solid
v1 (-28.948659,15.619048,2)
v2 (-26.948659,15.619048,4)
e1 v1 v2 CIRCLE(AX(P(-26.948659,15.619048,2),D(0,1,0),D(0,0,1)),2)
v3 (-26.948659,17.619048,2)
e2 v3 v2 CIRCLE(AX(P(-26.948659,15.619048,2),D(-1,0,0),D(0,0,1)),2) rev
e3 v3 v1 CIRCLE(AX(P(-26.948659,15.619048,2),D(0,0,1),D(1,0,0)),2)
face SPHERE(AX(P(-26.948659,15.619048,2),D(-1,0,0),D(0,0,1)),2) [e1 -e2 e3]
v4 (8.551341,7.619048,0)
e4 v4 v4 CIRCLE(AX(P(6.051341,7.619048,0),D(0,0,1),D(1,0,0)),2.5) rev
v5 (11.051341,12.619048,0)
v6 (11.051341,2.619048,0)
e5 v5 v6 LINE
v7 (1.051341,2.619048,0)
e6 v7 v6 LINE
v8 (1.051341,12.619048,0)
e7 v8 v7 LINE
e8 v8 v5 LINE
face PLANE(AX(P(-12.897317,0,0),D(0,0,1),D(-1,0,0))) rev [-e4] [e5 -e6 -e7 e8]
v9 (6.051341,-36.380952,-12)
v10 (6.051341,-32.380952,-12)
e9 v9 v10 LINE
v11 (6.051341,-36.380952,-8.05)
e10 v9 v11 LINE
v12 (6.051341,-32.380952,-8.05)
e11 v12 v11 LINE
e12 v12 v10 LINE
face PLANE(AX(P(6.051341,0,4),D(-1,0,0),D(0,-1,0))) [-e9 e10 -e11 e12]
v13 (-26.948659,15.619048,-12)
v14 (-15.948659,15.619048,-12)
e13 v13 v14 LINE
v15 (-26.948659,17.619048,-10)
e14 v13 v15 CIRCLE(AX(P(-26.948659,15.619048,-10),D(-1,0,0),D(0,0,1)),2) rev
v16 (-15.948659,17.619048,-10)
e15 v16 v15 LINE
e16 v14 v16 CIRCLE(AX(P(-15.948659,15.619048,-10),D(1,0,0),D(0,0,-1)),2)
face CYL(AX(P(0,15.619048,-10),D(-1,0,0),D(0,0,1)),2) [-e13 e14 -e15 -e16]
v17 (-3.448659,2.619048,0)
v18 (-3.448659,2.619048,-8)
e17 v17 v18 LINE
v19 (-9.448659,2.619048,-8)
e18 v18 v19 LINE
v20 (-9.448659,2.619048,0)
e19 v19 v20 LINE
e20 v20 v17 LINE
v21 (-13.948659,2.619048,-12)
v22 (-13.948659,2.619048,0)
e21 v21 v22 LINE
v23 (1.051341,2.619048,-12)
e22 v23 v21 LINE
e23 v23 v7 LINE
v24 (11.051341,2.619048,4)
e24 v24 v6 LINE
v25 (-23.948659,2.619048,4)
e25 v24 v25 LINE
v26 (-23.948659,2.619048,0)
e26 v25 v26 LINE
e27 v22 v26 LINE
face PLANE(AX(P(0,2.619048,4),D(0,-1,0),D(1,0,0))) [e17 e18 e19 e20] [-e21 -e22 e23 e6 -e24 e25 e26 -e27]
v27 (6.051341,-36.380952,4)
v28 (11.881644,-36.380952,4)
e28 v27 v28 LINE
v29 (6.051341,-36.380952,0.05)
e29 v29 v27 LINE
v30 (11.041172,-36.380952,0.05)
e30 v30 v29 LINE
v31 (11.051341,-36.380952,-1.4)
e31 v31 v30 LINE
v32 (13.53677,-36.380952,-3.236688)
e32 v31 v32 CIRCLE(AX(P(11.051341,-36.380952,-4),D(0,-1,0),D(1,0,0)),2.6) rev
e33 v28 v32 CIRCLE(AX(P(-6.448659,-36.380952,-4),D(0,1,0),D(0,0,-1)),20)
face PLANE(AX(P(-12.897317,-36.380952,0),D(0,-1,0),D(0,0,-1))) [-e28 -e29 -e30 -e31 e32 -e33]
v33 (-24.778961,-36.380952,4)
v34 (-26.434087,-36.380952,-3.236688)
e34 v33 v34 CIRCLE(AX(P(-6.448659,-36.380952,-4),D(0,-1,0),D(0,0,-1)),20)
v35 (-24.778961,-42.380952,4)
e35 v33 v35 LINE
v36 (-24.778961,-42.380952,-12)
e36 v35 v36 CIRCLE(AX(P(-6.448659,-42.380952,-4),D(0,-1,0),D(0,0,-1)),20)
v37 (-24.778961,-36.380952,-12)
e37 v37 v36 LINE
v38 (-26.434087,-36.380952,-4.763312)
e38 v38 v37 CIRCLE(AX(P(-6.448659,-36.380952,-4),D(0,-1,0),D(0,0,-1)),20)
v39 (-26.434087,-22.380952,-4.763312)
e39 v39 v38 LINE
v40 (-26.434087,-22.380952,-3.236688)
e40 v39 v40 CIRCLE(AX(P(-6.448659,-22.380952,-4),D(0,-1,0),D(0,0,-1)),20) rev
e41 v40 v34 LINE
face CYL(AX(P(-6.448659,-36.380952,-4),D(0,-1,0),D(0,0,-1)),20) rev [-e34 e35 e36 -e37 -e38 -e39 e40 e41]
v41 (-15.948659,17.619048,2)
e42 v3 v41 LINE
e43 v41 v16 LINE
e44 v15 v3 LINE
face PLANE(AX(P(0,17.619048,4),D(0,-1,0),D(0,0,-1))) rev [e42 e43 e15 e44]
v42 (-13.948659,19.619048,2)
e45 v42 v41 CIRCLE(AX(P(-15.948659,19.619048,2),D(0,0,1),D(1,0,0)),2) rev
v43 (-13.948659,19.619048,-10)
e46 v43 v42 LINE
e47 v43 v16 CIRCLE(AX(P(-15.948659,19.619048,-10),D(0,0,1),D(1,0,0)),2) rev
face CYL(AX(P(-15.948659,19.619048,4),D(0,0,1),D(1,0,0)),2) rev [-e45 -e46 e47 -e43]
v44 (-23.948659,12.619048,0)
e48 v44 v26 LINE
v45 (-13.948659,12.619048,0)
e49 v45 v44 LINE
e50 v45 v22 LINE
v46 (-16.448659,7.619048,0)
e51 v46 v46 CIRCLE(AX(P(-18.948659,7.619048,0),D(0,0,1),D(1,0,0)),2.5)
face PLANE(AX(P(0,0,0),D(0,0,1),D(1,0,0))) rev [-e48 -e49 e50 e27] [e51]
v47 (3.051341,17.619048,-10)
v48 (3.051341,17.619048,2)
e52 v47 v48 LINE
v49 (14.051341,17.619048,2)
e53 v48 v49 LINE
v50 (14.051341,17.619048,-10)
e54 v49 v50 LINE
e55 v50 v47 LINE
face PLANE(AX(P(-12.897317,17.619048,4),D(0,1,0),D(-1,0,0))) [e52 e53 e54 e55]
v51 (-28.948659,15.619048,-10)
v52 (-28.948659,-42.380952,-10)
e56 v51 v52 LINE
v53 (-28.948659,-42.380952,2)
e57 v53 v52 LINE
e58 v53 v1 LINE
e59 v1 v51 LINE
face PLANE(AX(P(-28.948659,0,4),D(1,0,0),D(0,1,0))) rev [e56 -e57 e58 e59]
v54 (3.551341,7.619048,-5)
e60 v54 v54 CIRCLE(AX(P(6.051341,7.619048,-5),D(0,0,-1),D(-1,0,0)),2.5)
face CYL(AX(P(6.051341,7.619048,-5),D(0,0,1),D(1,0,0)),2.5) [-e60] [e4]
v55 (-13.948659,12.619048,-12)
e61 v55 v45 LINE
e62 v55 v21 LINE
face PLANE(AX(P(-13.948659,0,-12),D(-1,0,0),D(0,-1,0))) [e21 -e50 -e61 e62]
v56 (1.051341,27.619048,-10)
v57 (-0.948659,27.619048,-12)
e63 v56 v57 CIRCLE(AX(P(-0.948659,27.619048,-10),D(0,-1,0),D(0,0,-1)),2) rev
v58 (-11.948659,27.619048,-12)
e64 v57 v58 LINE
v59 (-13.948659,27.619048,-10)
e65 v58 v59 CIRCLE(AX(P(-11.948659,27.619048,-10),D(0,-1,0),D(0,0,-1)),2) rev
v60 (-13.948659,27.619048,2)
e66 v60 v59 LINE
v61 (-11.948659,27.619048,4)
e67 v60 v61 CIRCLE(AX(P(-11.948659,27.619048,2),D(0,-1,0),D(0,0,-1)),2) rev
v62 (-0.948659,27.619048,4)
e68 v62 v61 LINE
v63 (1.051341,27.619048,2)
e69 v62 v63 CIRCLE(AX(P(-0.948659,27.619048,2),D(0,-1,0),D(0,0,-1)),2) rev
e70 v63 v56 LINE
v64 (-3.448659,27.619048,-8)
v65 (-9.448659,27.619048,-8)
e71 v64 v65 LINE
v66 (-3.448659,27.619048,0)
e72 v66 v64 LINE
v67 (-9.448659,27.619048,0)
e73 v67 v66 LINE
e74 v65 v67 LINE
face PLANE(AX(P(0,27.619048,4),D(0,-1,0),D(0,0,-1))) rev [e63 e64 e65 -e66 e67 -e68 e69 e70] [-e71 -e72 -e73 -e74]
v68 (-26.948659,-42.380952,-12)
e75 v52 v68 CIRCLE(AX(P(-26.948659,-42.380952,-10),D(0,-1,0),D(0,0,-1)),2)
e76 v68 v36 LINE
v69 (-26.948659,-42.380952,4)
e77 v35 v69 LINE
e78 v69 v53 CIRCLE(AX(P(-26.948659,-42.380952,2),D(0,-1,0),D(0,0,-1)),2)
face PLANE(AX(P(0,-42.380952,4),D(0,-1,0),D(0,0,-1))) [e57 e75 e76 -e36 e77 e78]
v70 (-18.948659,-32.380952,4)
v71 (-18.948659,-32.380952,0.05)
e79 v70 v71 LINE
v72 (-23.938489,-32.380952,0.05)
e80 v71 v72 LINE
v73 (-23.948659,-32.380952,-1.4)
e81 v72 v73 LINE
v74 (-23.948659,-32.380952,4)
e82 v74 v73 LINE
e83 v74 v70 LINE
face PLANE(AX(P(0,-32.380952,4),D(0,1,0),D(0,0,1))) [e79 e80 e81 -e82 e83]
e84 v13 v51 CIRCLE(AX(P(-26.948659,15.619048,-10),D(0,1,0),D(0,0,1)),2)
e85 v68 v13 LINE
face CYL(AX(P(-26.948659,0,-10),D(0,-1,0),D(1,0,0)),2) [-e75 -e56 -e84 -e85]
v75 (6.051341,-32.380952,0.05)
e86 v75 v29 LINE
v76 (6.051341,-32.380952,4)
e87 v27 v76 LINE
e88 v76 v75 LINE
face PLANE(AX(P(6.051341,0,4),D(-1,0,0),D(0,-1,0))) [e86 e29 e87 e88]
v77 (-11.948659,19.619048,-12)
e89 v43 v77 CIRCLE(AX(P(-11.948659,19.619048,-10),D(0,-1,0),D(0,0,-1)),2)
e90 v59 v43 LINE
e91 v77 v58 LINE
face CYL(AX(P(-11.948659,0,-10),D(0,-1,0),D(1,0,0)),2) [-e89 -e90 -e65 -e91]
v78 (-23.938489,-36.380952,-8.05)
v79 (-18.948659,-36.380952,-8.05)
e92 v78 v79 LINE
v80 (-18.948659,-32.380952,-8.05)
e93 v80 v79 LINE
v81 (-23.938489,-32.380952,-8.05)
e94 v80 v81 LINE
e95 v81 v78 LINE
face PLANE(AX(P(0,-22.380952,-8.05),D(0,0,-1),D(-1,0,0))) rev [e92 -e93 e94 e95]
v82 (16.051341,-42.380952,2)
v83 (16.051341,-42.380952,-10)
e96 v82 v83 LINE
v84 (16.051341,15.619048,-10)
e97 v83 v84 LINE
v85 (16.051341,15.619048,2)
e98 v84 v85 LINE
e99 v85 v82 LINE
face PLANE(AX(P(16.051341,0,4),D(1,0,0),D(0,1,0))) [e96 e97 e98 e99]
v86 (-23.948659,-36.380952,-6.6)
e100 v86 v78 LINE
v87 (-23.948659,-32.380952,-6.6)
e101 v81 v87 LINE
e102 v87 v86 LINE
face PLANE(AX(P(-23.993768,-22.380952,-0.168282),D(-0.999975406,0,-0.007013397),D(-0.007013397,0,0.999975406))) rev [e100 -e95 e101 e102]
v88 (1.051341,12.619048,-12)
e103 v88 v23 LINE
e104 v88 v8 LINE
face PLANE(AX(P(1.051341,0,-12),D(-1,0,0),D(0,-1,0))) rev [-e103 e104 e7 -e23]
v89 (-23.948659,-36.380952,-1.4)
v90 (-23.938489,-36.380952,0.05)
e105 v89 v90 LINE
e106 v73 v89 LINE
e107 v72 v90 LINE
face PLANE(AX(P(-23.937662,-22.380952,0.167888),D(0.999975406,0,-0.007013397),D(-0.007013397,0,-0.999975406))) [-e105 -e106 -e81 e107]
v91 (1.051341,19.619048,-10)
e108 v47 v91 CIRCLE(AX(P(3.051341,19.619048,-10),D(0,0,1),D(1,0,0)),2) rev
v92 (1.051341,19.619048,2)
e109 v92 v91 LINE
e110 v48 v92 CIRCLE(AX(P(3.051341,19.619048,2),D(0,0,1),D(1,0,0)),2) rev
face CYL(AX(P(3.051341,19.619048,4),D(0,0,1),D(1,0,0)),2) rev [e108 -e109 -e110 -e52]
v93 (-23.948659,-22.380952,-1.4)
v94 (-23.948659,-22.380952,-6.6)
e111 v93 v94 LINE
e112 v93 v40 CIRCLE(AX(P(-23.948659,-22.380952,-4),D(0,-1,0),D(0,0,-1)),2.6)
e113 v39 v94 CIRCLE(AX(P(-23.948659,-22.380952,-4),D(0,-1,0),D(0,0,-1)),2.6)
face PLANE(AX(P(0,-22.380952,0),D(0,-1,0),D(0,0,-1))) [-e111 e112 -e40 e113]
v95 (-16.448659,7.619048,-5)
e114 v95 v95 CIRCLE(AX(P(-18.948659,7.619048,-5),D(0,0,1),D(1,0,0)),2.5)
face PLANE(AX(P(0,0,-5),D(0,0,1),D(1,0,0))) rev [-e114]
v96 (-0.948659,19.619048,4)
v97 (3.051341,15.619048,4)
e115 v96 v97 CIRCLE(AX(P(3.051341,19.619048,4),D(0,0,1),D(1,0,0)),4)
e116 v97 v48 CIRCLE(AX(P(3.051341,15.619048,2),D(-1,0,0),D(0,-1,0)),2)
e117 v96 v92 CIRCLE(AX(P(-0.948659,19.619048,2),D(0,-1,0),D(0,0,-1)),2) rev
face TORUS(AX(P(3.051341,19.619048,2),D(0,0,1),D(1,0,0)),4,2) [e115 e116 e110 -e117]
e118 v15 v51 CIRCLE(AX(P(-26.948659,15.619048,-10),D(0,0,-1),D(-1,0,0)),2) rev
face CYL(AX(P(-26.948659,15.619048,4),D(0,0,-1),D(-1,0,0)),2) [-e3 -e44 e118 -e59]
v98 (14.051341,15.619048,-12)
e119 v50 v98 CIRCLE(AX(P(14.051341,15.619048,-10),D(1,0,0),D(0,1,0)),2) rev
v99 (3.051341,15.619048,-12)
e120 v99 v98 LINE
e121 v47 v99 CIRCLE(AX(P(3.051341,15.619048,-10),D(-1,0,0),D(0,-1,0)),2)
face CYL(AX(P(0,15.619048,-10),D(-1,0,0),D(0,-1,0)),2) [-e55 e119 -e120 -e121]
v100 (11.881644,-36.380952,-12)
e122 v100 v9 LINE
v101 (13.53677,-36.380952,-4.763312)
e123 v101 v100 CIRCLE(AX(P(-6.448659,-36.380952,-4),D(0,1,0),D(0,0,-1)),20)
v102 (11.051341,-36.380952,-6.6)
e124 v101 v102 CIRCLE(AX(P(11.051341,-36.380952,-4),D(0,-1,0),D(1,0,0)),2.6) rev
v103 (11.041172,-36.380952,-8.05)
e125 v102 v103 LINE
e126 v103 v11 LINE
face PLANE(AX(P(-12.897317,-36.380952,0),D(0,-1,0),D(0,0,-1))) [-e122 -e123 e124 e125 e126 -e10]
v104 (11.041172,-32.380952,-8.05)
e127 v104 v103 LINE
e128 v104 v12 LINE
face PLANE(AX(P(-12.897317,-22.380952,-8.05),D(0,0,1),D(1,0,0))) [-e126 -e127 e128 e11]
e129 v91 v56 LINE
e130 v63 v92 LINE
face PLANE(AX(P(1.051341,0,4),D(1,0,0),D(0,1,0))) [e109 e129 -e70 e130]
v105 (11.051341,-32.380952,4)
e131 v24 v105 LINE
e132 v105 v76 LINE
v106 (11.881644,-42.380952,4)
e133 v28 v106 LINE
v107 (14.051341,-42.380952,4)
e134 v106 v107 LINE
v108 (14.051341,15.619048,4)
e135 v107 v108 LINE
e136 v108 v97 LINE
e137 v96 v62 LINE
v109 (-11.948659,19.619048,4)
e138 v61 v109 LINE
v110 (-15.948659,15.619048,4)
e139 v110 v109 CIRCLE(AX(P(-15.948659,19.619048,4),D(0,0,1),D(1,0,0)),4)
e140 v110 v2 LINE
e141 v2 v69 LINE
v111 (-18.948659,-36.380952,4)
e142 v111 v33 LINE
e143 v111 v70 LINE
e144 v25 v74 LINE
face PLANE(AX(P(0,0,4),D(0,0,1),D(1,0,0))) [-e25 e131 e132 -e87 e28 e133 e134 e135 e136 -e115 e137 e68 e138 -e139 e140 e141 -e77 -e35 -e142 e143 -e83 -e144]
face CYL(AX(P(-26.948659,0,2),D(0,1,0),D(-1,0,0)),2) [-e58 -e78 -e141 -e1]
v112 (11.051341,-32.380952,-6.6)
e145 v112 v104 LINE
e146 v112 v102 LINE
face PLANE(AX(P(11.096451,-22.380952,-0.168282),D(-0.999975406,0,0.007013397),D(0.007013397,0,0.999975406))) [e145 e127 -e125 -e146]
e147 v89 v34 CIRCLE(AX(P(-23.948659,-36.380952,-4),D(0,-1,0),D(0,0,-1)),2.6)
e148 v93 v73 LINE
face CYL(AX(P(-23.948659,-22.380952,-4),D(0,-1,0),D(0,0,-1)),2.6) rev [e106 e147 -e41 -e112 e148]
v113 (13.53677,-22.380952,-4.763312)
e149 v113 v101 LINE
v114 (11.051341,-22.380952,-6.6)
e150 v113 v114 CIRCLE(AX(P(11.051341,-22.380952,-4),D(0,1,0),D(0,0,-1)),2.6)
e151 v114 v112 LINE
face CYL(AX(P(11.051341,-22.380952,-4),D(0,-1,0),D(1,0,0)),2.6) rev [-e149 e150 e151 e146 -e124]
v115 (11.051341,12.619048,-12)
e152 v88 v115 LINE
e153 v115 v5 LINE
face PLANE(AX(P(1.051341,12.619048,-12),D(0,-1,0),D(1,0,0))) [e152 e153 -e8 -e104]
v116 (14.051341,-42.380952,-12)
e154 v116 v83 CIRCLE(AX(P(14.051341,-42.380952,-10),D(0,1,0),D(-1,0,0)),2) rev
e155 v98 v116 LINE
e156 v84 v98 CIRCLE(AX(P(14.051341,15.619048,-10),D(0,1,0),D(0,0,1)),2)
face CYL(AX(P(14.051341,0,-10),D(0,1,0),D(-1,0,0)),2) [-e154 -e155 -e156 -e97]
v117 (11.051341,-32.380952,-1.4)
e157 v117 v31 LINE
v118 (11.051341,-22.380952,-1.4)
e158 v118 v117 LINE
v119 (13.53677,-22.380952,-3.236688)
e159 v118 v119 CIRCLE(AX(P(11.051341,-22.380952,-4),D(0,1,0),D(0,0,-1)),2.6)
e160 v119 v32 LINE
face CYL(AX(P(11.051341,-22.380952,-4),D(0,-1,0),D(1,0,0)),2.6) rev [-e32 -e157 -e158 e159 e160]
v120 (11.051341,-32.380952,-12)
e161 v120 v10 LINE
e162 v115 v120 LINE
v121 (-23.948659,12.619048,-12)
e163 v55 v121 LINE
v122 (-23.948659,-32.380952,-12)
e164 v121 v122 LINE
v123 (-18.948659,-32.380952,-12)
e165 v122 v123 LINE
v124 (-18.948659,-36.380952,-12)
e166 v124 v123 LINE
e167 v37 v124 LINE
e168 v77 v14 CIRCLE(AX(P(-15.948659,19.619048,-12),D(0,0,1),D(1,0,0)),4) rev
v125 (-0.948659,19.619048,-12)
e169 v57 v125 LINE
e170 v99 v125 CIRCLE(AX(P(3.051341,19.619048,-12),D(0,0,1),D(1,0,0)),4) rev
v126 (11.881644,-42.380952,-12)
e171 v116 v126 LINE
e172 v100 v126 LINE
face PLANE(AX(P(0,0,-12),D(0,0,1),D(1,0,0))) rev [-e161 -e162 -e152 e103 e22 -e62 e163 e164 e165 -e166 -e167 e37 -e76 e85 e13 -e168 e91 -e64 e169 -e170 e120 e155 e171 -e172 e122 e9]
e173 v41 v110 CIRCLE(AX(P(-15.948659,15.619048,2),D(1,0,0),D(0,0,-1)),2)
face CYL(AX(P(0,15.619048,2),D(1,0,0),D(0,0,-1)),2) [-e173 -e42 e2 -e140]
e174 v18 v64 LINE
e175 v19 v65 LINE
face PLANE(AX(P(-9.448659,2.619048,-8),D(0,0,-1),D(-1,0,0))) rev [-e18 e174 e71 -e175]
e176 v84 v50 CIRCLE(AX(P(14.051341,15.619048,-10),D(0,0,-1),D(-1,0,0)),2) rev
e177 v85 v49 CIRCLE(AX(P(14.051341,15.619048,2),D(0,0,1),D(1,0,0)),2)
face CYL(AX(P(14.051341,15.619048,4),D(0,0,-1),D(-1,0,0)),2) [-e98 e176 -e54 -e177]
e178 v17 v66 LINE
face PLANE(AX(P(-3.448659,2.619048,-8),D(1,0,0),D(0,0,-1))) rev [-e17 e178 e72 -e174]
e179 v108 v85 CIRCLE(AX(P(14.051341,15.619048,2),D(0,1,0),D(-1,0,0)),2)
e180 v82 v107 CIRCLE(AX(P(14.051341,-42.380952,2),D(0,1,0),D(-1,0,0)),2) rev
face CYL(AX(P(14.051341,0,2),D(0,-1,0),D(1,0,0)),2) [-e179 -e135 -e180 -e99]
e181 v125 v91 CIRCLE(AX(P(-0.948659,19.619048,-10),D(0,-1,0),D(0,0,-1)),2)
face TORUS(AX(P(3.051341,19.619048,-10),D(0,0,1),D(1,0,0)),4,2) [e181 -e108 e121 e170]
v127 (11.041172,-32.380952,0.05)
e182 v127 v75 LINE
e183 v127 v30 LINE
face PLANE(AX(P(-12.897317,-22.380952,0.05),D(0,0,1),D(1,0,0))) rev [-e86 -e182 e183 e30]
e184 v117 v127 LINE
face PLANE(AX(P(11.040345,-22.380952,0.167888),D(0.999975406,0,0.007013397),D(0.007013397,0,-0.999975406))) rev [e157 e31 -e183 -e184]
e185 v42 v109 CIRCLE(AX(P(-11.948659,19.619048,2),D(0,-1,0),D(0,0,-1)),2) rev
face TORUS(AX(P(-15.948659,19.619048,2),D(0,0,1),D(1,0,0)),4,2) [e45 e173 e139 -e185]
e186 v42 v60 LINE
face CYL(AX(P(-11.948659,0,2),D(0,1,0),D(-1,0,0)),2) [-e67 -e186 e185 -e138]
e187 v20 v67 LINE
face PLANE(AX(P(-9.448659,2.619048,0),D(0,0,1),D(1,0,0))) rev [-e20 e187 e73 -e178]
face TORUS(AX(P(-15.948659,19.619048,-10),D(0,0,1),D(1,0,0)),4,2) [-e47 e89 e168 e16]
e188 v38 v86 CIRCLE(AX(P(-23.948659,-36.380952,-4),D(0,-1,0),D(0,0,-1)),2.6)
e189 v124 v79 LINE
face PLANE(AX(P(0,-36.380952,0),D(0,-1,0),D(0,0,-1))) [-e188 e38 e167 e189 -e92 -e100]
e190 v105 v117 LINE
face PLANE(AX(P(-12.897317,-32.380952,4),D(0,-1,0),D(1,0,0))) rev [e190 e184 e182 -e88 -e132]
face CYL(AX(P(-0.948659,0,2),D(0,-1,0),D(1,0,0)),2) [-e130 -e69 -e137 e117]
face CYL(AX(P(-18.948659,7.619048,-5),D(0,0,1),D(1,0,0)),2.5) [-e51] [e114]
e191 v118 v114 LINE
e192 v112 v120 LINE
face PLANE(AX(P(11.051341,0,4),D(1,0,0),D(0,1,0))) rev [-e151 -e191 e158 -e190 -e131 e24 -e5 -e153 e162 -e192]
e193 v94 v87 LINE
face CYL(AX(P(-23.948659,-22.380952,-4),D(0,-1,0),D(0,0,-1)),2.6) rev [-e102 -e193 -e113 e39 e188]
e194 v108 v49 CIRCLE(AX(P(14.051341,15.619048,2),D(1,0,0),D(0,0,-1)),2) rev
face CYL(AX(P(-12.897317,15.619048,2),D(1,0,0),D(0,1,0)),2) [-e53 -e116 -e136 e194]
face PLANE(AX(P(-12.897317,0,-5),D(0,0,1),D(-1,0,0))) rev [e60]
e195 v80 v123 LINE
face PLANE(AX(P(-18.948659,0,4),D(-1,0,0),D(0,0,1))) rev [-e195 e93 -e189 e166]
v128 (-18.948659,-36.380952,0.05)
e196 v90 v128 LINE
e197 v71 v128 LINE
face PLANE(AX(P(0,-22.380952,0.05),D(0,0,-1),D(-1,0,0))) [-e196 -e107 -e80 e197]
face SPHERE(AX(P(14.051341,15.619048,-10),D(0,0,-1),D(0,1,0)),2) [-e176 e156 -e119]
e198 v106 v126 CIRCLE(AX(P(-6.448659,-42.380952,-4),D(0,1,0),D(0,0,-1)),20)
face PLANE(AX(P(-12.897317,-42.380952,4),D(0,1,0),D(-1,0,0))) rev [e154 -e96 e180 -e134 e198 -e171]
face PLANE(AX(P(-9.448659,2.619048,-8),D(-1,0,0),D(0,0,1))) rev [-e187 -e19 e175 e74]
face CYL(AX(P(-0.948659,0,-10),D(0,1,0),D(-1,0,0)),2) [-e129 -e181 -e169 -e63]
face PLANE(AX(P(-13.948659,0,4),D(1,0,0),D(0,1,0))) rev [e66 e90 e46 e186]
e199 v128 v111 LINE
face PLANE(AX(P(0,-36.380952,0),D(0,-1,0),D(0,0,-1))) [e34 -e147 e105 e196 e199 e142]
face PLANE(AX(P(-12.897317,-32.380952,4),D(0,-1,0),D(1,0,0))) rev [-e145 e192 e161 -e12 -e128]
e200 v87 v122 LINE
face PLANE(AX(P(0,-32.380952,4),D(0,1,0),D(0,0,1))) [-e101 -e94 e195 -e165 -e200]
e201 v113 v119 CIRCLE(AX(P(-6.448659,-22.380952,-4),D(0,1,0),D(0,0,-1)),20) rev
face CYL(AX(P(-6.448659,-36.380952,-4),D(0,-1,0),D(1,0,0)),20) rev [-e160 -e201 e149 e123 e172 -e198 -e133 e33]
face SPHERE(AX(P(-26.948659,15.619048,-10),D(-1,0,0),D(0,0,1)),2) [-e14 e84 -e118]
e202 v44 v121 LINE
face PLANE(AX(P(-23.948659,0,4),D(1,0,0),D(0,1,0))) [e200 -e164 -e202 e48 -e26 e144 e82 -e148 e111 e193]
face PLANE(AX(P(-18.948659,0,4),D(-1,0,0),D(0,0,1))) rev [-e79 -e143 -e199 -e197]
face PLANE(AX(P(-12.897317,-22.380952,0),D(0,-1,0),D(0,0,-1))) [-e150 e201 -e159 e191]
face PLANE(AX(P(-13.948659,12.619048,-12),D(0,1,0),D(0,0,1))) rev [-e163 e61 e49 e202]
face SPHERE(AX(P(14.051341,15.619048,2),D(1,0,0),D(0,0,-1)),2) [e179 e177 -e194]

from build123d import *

# Parameters (mm, degrees)
EXTRUDE_1_DEPTH     = 4
EXTRUDE_2_DEPTH     = 12
CUT_EXTRUDE_1_DEPTH = 6
CUT_EXTRUDE_START   = -20
CUT_EXTRUDE_2_DEPTH = 14
SKETCH_1_5_R        = 2.5
EXTRUDE_3_DEPTH     = 5
SKETCH_7_W          = 6
SKETCH_7_H          = 8
CUT_EXTRUDE_3_DEPTH = 25
FILLET_2_R          = 2


# Read off the part's stored shape, not the designer's step: 切除-拉伸2, 镜向1
with BuildPart() as part:
    # 草图1 → 凸台-拉伸1 (new body)
    with BuildSketch(Plane.XY):
        Polygon((-6.44865866, 2.619047619), (-6.44865866, 27.619047619), (-13.94865866, 27.619047619), (-13.94865866, 17.619047619), (-28.94865866, 17.619047619), (-28.94865866, -42.380952381), (-18.94865866, -42.380952381), (-18.94865866, -32.380952381), (-23.94865866, -32.380952381), (-23.94865866, 2.619047619), align=None)
    extrude(amount=EXTRUDE_1_DEPTH)

    # 草图1<4> → 凸台-拉伸2 (add)
    with BuildSketch(Plane.XY):
        Polygon((-13.94865866, 2.619047619), (-6.44865866, 2.619047619), (-6.44865866, 27.619047619), (-13.94865866, 27.619047619), (-13.94865866, 17.619047619), (-28.94865866, 17.619047619), (-28.94865866, -42.380952381), (-18.94865866, -42.380952381), (-18.94865866, -32.380952381), (-23.94865866, -32.380952381), (-23.94865866, 2.619047619), (-23.94865866, 12.619047619), (-13.94865866, 12.619047619), align=None)
    extrude(amount=-EXTRUDE_2_DEPTH)

    # 草图5 → 切除-拉伸1 (cut)
    with BuildSketch(Plane.XZ.offset(42.380952381)):
        with BuildLine():
            Line((-18.94865866, 4), (-23.425219682, 4))
            Line((-23.425219682, 4), (-24.77896144, 4))
            ThreePointArc((-24.77896144, 4), (-26.44865866, -4), (-24.77896144, -12))
            Line((-24.77896144, -12), (-18.94865866, -12))
            Line((-18.94865866, -12), (-18.94865866, 4))
        make_face()
    extrude(amount=-CUT_EXTRUDE_1_DEPTH, mode=Mode.SUBTRACT)

    # 切除-拉伸2 outline → 切除-拉伸2 (cut)
    with BuildSketch(Plane.XZ.offset(42.380952381).offset(CUT_EXTRUDE_START)):
        with BuildLine():
            ThreePointArc((-23.94865866, -1.4), (-25.493875387, -1.908994198), (-26.434087232, -3.236688257))
            ThreePointArc((-26.434087232, -3.236688257), (-26.44865866, -4), (-26.434087231, -4.763311743))
            ThreePointArc((-26.434087231, -4.763311743), (-25.493875387, -6.091005802), (-23.94865866, -6.6))
            Line((-23.94865866, -6.6), (-23.938488984, -8.05))
            Line((-23.938488984, -8.05), (-18.94865866, -8.05))
            Line((-18.94865866, -8.05), (-18.94865866, 0.05))
            Line((-18.94865866, 0.05), (-23.938488984, 0.05))
            Line((-23.938488984, 0.05), (-23.94865866, -1.4))
        make_face()
    extrude(amount=CUT_EXTRUDE_2_DEPTH, mode=Mode.SUBTRACT)

    # 草图1<5> → 凸台-拉伸3 (add)
    with BuildSketch(Plane.XY):
        with Locations((-18.94865866, 7.619047619)):
            Circle(SKETCH_1_5_R)
    extrude(amount=-EXTRUDE_3_DEPTH)

    # 镜向1: part across plane


with BuildPart() as part_1:
    add(part.part)
    add(part.part.mirror(Plane(origin=(-6.44865866, 0, 4), x_dir=(0, 0, 1), z_dir=(1, 0, 0))))

    # 草图7 → 切除-拉伸3 (cut)
    with BuildSketch(Plane(origin=(0, 27.619047619, 0), x_dir=(1, 0, 0), z_dir=(0, 1, 0))):
        with Locations((-6.44865866, 4)):
            Rectangle(SKETCH_7_W, SKETCH_7_H)
    extrude(amount=-CUT_EXTRUDE_3_DEPTH, mode=Mode.SUBTRACT)

    # 圆角2
    fillet_2_edges = [part_1.edges().sort_by_distance(p)[0] for p in [
        (16.05134134, -12.380952381, 4),
        (8.55134134, 17.619047619, 4),
        (16.05134134, 17.619047619, -4),
        (1.05134134, 22.619047619, 4),
        (1.05134134, 17.619047619, -4),
        (1.05134134, 22.619047619, -12),
        (8.55134134, 17.619047619, -12),
        (16.05134134, -12.380952381, -12),
        (-28.94865866, 17.619047619, -4),
        (-13.94865866, 17.619047619, -4),
        (-13.94865866, 22.619047619, 4),
        (-21.44865866, 17.619047619, 4),
        (-28.94865866, -12.380952381, 4),
        (-13.94865866, 22.619047619, -12),
        (-28.94865866, -12.380952381, -12),
        (-21.44865866, 17.619047619, -12),
    ]]
    fillet(fillet_2_edges, radius=FILLET_2_R)


solid = part_1.part
